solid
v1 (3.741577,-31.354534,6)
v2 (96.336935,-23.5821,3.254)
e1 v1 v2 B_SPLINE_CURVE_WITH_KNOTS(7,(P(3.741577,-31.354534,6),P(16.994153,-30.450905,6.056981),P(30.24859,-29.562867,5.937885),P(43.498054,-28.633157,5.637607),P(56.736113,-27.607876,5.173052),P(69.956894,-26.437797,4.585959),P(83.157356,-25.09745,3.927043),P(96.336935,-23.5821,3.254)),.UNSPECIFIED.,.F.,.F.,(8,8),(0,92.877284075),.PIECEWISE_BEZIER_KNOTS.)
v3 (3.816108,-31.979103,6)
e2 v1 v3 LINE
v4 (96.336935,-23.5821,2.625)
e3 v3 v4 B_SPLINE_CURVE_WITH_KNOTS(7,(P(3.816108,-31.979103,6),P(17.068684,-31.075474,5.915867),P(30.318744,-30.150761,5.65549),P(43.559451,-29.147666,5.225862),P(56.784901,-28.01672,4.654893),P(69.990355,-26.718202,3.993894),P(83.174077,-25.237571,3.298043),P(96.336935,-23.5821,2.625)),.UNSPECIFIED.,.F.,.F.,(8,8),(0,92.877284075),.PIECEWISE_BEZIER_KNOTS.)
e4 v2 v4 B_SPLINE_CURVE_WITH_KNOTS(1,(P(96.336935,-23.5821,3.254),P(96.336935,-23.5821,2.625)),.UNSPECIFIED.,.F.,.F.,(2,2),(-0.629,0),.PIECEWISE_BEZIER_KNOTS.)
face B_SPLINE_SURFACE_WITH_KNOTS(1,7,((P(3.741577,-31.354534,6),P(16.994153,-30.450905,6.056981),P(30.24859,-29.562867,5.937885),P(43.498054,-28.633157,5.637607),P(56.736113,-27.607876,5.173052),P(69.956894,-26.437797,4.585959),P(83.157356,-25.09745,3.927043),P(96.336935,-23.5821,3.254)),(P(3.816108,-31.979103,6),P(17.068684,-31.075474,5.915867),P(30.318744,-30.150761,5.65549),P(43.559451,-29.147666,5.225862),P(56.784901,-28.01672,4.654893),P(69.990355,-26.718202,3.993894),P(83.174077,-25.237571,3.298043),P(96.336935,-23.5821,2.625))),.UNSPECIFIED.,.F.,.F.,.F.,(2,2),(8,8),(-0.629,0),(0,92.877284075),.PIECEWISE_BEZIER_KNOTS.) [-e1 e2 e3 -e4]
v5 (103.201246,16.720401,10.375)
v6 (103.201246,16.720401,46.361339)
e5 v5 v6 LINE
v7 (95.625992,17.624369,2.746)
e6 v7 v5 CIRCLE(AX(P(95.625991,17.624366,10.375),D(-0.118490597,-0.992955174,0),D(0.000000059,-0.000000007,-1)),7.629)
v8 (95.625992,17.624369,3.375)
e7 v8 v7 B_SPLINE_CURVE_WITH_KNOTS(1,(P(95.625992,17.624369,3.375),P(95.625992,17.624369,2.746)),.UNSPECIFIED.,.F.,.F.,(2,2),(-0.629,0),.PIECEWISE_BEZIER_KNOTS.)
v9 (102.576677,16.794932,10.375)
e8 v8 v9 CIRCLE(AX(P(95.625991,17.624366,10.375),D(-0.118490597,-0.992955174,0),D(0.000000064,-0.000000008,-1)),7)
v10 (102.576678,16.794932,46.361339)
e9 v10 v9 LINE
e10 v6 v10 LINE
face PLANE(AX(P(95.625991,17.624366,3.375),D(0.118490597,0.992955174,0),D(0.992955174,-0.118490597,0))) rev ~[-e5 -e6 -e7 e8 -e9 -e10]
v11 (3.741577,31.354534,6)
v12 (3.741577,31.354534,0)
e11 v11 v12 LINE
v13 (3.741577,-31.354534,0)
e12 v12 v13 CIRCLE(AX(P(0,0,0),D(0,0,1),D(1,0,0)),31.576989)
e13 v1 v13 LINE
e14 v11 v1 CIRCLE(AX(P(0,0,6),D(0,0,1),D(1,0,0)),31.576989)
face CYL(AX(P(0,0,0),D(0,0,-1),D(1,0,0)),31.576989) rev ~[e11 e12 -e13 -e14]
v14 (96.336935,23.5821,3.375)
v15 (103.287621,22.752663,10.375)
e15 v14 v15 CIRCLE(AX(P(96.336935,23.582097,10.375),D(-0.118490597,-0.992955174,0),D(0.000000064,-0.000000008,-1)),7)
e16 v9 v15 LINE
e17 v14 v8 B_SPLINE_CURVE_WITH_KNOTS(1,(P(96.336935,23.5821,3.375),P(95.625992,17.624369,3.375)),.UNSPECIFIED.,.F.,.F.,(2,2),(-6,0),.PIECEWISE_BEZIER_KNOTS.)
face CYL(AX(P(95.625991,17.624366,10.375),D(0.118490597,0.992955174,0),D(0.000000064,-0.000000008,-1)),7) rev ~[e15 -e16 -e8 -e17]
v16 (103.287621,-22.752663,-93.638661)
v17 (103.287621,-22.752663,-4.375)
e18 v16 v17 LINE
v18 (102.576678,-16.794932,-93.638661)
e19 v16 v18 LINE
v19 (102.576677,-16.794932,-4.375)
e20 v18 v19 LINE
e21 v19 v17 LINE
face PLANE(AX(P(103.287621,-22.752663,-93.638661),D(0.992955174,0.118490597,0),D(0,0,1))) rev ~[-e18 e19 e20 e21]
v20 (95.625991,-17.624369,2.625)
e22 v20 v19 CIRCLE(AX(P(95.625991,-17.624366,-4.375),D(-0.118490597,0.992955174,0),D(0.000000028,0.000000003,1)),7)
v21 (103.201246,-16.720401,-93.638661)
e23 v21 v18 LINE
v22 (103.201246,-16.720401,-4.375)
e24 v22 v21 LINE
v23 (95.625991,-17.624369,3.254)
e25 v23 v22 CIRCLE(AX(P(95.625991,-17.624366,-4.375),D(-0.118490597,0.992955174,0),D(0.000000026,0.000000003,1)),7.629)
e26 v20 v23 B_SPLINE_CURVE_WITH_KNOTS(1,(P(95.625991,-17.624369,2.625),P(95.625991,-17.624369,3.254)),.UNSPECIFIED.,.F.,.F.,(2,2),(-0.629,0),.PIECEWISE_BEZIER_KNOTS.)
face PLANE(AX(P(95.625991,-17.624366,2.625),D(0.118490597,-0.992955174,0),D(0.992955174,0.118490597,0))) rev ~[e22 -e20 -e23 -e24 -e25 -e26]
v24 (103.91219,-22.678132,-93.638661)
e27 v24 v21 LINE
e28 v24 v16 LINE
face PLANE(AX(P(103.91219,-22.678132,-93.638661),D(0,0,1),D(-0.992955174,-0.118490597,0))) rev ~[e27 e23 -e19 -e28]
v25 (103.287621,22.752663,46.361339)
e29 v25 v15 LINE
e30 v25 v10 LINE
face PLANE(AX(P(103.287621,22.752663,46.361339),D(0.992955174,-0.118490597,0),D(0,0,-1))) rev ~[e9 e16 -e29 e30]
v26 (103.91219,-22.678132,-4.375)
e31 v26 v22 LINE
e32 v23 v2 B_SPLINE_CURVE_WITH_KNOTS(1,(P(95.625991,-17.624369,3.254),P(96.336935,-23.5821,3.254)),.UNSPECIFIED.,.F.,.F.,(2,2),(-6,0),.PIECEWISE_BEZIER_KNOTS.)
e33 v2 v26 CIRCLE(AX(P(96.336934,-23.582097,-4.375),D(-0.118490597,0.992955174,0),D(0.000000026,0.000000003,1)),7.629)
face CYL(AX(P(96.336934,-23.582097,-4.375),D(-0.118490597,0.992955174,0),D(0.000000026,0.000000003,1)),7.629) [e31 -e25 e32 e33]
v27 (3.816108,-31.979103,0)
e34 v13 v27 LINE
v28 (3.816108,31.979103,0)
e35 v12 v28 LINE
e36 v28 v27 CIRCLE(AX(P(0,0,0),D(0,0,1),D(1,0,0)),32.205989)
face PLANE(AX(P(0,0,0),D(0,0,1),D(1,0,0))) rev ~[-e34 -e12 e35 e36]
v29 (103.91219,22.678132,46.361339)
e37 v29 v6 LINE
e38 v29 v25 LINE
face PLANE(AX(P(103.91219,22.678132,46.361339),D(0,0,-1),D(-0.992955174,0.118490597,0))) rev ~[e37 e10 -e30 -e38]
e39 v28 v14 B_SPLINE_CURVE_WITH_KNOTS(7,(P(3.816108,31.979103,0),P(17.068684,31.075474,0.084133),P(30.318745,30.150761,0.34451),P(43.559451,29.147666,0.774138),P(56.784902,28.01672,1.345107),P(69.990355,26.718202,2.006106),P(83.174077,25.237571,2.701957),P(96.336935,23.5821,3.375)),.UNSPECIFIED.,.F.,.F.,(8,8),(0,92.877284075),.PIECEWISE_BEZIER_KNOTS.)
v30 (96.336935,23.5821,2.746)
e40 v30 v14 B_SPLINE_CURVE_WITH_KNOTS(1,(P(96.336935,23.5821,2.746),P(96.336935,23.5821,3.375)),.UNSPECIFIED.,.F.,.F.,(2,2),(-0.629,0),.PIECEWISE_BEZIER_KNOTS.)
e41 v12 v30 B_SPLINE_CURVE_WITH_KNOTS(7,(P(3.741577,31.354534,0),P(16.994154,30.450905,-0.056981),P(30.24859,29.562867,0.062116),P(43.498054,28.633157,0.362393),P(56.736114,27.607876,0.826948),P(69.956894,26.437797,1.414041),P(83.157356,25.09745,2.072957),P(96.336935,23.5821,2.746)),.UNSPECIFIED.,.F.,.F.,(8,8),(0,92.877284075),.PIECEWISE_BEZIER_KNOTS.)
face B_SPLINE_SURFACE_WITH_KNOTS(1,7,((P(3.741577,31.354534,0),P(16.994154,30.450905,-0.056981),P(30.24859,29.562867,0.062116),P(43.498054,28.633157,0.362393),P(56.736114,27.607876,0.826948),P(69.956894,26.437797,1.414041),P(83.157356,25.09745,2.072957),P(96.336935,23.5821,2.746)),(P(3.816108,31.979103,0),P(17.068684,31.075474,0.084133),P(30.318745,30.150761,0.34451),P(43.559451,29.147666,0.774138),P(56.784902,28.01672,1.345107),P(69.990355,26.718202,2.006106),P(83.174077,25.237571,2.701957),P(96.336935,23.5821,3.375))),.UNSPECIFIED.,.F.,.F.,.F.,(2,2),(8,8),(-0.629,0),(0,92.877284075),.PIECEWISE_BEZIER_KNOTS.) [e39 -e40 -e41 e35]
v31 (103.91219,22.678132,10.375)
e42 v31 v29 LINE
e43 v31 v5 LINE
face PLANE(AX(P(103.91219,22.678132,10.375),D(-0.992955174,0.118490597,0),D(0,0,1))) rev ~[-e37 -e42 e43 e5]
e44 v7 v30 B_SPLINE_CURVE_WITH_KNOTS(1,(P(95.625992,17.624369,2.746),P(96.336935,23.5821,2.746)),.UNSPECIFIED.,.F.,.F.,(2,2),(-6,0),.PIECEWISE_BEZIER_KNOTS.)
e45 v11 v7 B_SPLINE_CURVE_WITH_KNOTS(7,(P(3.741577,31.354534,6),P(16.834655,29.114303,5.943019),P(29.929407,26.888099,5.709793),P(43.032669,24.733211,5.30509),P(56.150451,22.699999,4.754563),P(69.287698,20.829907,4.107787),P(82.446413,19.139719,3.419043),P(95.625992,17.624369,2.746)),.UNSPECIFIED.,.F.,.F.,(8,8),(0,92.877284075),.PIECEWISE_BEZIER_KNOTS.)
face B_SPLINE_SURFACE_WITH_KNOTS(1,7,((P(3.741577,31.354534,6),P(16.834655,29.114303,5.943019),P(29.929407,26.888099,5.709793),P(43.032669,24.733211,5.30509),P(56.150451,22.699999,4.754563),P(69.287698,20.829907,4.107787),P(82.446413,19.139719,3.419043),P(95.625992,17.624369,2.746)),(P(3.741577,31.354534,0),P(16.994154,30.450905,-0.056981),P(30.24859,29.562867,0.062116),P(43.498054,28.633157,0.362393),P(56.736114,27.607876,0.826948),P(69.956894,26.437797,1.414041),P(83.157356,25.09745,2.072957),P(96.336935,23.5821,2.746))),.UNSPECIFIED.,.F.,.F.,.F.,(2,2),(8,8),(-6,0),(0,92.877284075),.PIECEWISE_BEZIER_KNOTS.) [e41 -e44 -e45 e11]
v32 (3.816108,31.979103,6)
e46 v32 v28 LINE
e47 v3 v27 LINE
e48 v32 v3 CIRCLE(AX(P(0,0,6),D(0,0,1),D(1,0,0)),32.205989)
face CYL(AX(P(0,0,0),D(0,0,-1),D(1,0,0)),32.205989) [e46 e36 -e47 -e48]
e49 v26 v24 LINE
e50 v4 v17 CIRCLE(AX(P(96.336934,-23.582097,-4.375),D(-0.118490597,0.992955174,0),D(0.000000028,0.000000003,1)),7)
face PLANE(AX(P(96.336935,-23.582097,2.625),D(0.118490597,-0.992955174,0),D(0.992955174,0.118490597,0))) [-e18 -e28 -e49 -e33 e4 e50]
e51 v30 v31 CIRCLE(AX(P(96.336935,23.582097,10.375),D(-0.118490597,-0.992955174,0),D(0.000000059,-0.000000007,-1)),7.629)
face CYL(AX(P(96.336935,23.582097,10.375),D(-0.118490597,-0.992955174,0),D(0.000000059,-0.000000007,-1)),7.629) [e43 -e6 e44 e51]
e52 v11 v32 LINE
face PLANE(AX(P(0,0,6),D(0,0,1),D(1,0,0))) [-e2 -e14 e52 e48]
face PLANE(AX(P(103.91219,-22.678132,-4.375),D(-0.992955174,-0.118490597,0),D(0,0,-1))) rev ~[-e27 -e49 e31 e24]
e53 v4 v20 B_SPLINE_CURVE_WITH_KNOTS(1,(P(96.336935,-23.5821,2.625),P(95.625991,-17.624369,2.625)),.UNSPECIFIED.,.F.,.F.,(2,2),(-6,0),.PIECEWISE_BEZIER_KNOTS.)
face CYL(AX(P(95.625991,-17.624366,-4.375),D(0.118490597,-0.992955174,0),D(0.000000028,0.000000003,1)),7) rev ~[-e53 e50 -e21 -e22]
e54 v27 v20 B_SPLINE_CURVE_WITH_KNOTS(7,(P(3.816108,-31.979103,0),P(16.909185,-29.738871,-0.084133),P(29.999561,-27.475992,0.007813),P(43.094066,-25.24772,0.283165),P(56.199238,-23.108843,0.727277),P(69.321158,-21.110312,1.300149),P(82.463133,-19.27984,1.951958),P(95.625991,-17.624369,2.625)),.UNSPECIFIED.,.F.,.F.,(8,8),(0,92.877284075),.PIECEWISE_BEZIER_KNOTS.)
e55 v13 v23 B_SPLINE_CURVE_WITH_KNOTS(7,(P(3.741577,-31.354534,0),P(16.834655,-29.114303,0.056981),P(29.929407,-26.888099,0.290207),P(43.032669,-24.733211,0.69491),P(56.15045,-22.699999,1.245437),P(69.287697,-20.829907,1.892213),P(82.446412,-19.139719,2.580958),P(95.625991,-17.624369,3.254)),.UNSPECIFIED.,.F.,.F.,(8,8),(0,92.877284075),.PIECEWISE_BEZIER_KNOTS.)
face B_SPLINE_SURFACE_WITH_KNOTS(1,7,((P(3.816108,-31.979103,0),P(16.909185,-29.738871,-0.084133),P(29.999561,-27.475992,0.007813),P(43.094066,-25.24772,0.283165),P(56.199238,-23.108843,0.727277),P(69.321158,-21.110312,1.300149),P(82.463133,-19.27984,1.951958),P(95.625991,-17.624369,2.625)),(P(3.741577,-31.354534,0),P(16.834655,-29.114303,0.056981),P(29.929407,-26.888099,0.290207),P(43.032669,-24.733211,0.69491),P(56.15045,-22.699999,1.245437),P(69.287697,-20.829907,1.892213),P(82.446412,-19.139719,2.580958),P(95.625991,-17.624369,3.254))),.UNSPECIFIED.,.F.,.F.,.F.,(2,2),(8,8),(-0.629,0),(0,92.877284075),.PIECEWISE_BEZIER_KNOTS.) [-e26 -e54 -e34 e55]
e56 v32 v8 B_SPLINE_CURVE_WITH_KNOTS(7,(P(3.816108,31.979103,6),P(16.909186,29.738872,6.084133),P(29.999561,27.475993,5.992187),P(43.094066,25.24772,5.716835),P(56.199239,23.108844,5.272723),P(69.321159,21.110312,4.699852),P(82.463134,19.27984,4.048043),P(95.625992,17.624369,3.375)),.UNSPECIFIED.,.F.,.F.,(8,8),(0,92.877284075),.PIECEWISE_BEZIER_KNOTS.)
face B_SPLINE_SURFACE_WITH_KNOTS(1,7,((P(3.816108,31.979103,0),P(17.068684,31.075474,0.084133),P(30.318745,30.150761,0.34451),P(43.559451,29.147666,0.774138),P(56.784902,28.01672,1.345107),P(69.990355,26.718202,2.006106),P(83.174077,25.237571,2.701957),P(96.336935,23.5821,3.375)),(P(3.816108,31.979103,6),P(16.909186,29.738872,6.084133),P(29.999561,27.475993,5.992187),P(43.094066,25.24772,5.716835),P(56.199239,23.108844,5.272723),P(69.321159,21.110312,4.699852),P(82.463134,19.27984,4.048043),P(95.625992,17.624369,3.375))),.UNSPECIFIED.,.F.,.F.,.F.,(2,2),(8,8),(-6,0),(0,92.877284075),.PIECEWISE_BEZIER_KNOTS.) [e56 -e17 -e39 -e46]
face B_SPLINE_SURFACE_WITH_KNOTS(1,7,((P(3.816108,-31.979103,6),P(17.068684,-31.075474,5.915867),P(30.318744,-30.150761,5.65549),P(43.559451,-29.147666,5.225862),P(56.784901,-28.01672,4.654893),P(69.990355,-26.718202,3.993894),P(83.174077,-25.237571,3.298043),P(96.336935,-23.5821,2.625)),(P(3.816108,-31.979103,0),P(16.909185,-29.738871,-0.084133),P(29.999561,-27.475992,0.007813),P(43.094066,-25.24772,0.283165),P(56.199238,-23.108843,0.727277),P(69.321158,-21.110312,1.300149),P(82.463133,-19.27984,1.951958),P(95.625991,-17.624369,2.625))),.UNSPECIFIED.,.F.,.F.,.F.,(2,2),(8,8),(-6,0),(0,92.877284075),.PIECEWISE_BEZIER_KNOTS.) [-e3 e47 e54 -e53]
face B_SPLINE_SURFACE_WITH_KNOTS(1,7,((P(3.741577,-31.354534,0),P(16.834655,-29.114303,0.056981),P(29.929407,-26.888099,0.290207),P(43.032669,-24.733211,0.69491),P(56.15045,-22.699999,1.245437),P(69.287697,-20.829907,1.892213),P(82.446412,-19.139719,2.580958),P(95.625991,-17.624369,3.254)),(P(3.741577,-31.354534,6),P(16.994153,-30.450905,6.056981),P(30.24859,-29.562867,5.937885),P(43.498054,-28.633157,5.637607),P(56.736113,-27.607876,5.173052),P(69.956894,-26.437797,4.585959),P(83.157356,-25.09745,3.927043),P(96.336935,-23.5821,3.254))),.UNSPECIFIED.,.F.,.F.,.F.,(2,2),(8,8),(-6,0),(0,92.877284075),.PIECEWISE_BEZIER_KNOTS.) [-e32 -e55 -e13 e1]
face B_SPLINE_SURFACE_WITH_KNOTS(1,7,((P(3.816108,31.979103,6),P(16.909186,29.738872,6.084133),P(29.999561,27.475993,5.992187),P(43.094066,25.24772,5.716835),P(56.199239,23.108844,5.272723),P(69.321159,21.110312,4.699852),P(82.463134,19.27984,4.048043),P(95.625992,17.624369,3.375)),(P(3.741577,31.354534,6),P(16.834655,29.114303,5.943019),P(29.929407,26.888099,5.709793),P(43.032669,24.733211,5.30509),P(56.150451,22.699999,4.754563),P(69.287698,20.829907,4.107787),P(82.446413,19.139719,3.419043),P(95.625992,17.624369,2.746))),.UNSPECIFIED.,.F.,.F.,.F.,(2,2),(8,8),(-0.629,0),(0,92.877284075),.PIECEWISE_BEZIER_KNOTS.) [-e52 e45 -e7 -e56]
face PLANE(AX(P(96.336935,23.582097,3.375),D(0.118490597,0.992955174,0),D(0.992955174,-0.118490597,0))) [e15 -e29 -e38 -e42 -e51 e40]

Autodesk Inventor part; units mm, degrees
ref_plane "YZ Plane" through (0, 0, 0) normal (1, 0, 0) x (0, 1, 0)
ref_plane "XZ Plane" through (0, 0, 0) normal (0, 1, 0) x (-1, 0, 0)
ref_plane "XY Plane" through (0, 0, 0) normal (0, 0, 1) x (1, 0, 0)
sketch "Sketch1" plane through (0, 0, 0) normal (0, 0, 1) x (1, 0, 0)
  circle A0 centre (0, 0) radius 31.830989
  circle A1 centre (0, 0) radius 32.205989
  circle A2 centre (0, 0) radius 31.576989
  dimension "d0" = 63.66198
  dimension "d2" = 0.254
  dimension "d3" = 0.375
sketch "Sketch1 outline for Extrusion1" plane through (0, 0, 0) normal (0, 0, 1) x (1, 0, 0)
  circle A0 centre (0, 0) radius 32.205989
  circle A1 centre (0, 0) radius 31.576989
extrude "Extrusion1" add sketch "Sketch1 outline for Extrusion1" along normal blind 6
sketch "Sketch2" plane through (0, 0, 6) normal (0, 0, 1) x (1, 0, 0)
  circle A0 centre (0, 0) radius 32.205989
  line L0 (0, 0) -> (3.816108, 31.979103)
  line L1 (0, 0) -> (3.816108, -31.979103)
  dimension "d6" = 166.39
extrude "Extrusion2" cut sketch "Sketch2" against normal through all contours A0 L1 L0 picked at (21.157827, -2.572713)
sketch "Sketch3" plane through (3.816108, 31.979103, 6) normal (0.9929552, -0.1184906, 0) x (0, 0, -1)
  line L0 (6, 0) -> (6, -0.629) projected
  line L1 (0, 0) -> (6, 0) projected
  line L2 (0, -0.629) -> (0, 0) projected
  line L3 (6, -0.629) -> (0, -0.629) projected
  point P0 (6, -32.205989)
  point P1 (3, -0.375)
  point P2 (3, -0.629)
  dimension "d9" = 0.254
coil "Coil1" sketch "Sketch3" operation add axis through (3.771674, 31.606745, 3) along (0.9929552, -0.1184906, 0) pitch 371.456 turns 0.25 hand right
sketch "Sketch4" plane through (3.741577, -31.354534, 6) normal (0.9929552, 0.1184906, 0) x (0, 0, -1)
  line L0 (6, 0) -> (6, -0.629) projected
  line L1 (0, 0) -> (6, 0) projected
  line L2 (0, -0.629) -> (0, 0) projected
  line L3 (6, -0.629) -> (0, -0.629) projected
  point P0 (6, 31.576989)
  point P1 (3, -0.254)
  point P2 (3, 0)
  dimension "d18" = 0.254
coil "Coil2" sketch "Sketch4" operation add axis through (3.771674, -31.606745, 3) along (0.9929552, 0.1184906, 0) pitch 371.456 turns 0.25 hand right
sketch "Sketch5" plane through (95.625991, -17.624366, 3.254) normal (0.9929552, 0.1184906, 0) x (0, 0, -1)
  line L0 (0.629, 0) -> (0.629, -6)
  line L1 (0, 0) -> (0.629, 0)
  line L2 (0, -6) -> (0, 0)
  line L3 (0.629, -6) -> (0, -6)
  line L4 (7.629, 3.824142) -> (7.629, -17.635602)
  point P0 (3.254, 28.830989)
  dimension "d27" = 7
revolve "Revolution1" add sketch "Sketch5" angle 90 about axis through (95.172866, -13.827165, -4.375) along (-0.1184906, 0.9929552, 0)
sketch "Sketch6" plane through (96.336935, 23.582097, 3.375) normal (0.9929552, -0.1184906, 0) x (0, 0, -1)
  line L0 (0.629, 0) -> (0.629, -6)
  line L1 (0, 0) -> (0.629, 0)
  line L2 (0, -6) -> (0, 0)
  line L3 (0.629, -6) -> (0, -6)
  line L4 (-7, 6.068729) -> (-7, -13.038094)
  point P0 (3.375, -34.830989)
  dimension "d29" = 7
revolve "Revolution2" add sketch "Sketch6" angle 90 about axis through (97.056022, 29.608074, 10.375) along (-0.1184906, -0.9929552, 0)
sketch "Sketch9" plane through (96.336935, -23.582097, 2.625) normal (0.1184906, -0.9929552, 0) x (0.9929552, 0.1184906, 0)
  line L0 (7, -7) -> (7.629, -7)
  line L1 (7.629, -7) -> (7.629, -96.263661)
  line L2 (7.629, -96.263661) -> (7, -96.263661)
  line L3 (7, -96.263661) -> (7, -7)
  line L4 (-19.311334, -96.263661) -> (32.837796, -96.263661)
  point P0 (-92.864, -2.625)
extrude "Extrusion5" add sketch "Sketch9" against normal up to surface (6 mm away)
sketch "Sketch8" plane through (96.336935, 23.582097, 3.375) normal (0.1184906, 0.9929552, 0) x (0.9929552, -0.1184906, 0)
  line L0 (7, -7) -> (7.629, -7)
  line L1 (7.629, -7) -> (7.629, -42.986339)
  line L2 (7.629, -42.986339) -> (7, -42.986339)
  line L3 (7, -42.986339) -> (7, -7)
  line L4 (-19.443403, -42.986339) -> (32.667261, -42.986339)
  point P0 (-92.864, 3.375)
extrude "Extrusion4" add sketch "Sketch8" against normal up to surface (6 mm away)
properties part number "end belt"
